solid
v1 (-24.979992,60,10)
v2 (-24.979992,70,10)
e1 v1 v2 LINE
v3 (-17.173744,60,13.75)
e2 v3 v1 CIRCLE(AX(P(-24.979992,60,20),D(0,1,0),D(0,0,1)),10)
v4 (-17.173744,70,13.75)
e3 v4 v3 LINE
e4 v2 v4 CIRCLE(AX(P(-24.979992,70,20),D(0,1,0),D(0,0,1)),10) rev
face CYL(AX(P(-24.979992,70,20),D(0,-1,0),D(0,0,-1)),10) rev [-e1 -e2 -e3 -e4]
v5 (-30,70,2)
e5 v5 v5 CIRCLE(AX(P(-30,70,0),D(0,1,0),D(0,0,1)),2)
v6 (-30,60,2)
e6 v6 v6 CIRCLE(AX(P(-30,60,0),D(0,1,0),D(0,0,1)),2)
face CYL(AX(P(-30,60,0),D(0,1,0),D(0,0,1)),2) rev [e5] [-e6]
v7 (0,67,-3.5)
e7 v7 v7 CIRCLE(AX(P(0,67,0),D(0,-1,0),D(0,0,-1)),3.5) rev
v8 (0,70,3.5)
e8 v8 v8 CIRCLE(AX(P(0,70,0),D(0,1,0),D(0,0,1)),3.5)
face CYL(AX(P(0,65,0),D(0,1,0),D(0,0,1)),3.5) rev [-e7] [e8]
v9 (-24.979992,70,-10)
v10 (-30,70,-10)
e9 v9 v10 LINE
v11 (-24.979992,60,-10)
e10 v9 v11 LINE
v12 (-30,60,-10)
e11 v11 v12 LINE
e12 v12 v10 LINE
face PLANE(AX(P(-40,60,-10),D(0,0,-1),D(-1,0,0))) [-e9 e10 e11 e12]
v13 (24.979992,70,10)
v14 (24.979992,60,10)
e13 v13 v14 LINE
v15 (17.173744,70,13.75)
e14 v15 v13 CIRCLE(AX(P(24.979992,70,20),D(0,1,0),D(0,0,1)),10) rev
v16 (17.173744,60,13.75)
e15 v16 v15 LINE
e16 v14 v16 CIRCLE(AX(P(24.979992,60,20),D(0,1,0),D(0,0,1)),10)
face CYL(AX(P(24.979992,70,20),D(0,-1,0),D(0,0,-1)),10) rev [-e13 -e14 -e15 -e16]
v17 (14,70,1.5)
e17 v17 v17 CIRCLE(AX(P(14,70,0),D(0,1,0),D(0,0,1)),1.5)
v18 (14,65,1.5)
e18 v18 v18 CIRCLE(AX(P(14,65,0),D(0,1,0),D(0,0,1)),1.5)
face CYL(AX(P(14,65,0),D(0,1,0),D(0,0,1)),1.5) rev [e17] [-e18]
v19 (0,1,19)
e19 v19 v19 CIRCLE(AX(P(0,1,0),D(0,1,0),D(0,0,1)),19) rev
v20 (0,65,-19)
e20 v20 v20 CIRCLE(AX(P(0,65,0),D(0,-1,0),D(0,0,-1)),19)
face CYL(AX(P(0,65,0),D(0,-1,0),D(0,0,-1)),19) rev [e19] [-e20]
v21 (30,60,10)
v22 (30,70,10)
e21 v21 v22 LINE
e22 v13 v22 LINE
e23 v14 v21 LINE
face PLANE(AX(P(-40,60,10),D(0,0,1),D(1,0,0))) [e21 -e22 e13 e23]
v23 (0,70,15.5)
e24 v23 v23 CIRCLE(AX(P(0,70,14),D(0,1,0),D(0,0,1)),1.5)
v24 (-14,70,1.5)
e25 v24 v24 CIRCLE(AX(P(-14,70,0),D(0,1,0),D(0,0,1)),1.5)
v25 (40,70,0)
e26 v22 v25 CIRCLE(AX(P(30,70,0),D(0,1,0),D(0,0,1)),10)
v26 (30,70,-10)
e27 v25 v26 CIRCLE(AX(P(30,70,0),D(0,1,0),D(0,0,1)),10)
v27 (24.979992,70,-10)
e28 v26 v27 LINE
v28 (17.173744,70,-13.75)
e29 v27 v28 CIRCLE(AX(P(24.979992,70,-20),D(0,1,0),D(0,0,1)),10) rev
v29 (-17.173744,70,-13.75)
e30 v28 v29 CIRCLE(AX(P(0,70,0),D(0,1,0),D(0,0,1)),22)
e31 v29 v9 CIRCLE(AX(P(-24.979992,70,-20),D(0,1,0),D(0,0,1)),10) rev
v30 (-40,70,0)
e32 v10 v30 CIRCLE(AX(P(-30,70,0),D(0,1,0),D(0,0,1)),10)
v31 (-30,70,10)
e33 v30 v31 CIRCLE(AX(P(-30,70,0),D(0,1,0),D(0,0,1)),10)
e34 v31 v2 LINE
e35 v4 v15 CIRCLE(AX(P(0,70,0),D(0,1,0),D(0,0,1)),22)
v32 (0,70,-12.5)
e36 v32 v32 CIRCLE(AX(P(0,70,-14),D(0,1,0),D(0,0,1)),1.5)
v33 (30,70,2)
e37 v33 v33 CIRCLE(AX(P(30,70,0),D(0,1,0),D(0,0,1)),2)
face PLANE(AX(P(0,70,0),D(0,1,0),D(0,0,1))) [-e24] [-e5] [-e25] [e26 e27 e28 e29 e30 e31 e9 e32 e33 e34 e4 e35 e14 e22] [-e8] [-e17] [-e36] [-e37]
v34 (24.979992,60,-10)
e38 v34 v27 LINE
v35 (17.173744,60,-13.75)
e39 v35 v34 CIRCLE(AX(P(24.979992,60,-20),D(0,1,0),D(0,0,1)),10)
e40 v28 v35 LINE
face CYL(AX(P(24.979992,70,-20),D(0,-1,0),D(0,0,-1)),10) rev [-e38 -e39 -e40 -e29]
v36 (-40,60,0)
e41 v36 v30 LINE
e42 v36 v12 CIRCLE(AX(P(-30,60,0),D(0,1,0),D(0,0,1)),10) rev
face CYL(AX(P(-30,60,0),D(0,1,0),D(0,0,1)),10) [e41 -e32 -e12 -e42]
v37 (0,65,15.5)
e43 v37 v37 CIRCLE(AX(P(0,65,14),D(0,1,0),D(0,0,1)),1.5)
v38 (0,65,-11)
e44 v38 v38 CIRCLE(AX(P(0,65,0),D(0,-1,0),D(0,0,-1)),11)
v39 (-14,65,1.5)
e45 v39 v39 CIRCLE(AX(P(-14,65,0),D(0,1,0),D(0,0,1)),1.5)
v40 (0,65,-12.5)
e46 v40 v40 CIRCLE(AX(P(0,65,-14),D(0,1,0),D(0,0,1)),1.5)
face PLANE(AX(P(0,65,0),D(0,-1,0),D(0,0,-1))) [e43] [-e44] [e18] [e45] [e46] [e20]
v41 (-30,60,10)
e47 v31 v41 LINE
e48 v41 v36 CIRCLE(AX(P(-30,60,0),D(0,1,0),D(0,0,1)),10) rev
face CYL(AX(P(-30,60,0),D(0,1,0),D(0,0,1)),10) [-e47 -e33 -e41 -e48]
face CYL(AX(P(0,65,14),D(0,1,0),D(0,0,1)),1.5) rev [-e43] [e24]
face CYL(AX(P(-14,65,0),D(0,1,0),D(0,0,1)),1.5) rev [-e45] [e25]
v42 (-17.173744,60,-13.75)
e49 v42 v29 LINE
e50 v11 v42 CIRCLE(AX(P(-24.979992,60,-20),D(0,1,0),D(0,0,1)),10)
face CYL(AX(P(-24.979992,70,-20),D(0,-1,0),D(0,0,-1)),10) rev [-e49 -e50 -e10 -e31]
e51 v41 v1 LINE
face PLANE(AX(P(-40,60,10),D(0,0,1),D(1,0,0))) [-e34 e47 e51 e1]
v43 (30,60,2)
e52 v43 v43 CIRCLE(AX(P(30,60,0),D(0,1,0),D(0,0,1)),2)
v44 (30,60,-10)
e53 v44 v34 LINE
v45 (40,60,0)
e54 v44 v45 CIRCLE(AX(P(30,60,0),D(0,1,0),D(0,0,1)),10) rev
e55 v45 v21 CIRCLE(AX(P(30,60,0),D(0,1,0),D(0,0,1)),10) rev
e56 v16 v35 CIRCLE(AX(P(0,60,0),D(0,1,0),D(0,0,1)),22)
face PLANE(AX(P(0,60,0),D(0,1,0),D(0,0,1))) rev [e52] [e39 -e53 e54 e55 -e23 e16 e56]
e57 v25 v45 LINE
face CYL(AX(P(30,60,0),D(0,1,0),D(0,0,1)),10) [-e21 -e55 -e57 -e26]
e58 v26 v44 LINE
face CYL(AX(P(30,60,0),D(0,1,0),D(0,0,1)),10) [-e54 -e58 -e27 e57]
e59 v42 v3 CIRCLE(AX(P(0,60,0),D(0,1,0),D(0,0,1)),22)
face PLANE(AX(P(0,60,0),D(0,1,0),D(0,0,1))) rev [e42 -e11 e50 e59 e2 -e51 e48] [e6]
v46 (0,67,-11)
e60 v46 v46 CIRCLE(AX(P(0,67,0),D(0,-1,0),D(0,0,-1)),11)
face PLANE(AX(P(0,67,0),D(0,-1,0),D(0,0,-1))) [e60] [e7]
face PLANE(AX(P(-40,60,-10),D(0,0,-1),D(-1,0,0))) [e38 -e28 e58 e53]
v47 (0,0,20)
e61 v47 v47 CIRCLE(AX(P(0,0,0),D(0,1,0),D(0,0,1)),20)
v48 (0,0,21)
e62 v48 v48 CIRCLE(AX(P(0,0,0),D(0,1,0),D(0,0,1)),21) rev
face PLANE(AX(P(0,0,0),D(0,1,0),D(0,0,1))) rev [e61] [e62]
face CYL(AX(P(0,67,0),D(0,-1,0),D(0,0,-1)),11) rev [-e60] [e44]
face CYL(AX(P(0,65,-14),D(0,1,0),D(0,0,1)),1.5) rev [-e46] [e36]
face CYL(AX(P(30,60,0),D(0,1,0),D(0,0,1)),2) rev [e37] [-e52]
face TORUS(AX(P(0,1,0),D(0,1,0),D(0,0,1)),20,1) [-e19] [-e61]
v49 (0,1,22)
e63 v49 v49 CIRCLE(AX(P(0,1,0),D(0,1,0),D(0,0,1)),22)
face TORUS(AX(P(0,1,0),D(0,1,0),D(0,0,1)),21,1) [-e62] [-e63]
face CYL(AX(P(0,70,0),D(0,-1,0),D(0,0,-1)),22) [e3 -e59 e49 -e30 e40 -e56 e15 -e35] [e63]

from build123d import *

# Parameters (mm, degrees)
SKETCH3_R           = 22
BOSS_EXTRUDE1_DEPTH = 70
SKETCH14_W          = 80
SKETCH14_H          = 20
BOSS_EXTRUDE3_DEPTH = 10
SKETCH4_R           = 19
CUT_EXTRUDE1_DEPTH  = 65
SKETCH5_R           = 3.5
CUT_EXTRUDE2_DEPTH  = 5
SKETCH7_R           = 1.5
CUT_EXTRUDE3_DEPTH  = 5
SKETCH15_R          = 2
CUT_EXTRUDE6_DEPTH  = 10
FILLET1_R           = 10
FILLET2_R           = 10
FILLET3_R           = 10
FILLET4_R           = 1
SKETCH16_R          = 11
CUT_EXTRUDE7_DEPTH  = 2


with BuildPart() as part:
    # Sketch3 → Boss-Extrude1 (new body)
    with BuildSketch(Plane(origin=(0, 0, 0), x_dir=(1, 0, 0), z_dir=(0, 1, 0))):
        with Locations(Location((0, 0, 0), (0, 0, 270))):
            Circle(SKETCH3_R)
    extrude(amount=BOSS_EXTRUDE1_DEPTH)

    # Sketch14 → Boss-Extrude3 (add)
    with BuildSketch(Plane(origin=(0, 70, 0), x_dir=(1, 0, 0), z_dir=(0, 1, 0))):
        Rectangle(SKETCH14_W, SKETCH14_H)
    extrude(amount=-BOSS_EXTRUDE3_DEPTH)

    # Sketch4 → Cut-Extrude1 (cut)
    with BuildSketch(Plane(origin=(0, 0, 0), x_dir=(-1, 0, 0), z_dir=(0, -1, 0))):
        with Locations(Location((0, 0, 0), (0, 0, 90))):
            Circle(SKETCH4_R)
    extrude(amount=-CUT_EXTRUDE1_DEPTH, mode=Mode.SUBTRACT)

    # Sketch5 → Cut-Extrude2 (cut)
    with BuildSketch(Plane(origin=(0, 70, 0), x_dir=(1, 0, 0), z_dir=(0, 1, 0))):
        with Locations(Location((0, 0, 0), (0, 0, 270))):
            Circle(SKETCH5_R)
    extrude(amount=-CUT_EXTRUDE2_DEPTH, mode=Mode.SUBTRACT)

    # Sketch7 → Cut-Extrude3 (cut)
    with BuildSketch(Plane(origin=(0, 70, 0), x_dir=(1, 0, 0), z_dir=(0, 1, 0))):
        with Locations(Location((0, -14, 0), (0, 0, 270))):
            Circle(SKETCH7_R)
        with Locations(Location((0, 14, 0), (0, 0, 270))):
            Circle(SKETCH7_R)
        with Locations(Location((14, 0, 0), (0, 0, 270))):
            Circle(SKETCH7_R)
        with Locations(Location((-14, 0, 0), (0, 0, 270))):
            Circle(SKETCH7_R)
    extrude(amount=-CUT_EXTRUDE3_DEPTH, mode=Mode.SUBTRACT)

    # Sketch15 → Cut-Extrude6 (cut)
    with BuildSketch(Plane(origin=(0, 70, 0), x_dir=(1, 0, 0), z_dir=(0, 1, 0))):
        with Locations(Location((30, 0, 0), (0, 0, 270))):
            Circle(SKETCH15_R)
        with Locations(Location((-30, 0, 0), (0, 0, 270))):
            Circle(SKETCH15_R)
    extrude(amount=-CUT_EXTRUDE6_DEPTH, mode=Mode.SUBTRACT)

    # Fillet1
    fillet1_edges = [part.edges().sort_by_distance(p)[0] for p in [
        (40, 65, -10),
        (40, 65, 10),
    ]]
    fillet(fillet1_edges, radius=FILLET1_R - 0.0001)  # a hair under: the kernel refuses the full size

    # Fillet2
    fillet2_edges = [part.edges().sort_by_distance(p)[0] for p in [
        (-40, 65, -10),
        (-40, 65, 10),
    ]]
    fillet(fillet2_edges, radius=FILLET2_R - 0.0001)  # a hair under: the kernel refuses the full size

    # Fillet3
    fillet3_edges = [part.edges().sort_by_distance(p)[0] for p in [
        (-19.595917942, 65, 10),
        (19.595917942, 65, 10),
        (19.595917942, 65, -10),
        (-19.595917942, 65, -10),
    ]]
    fillet(fillet3_edges, radius=FILLET3_R)

    # Fillet4
    fillet4_edges = [part.edges().sort_by_distance(p)[0] for p in [
        (0, 0, -22),
        (0, 0, 19),
    ]]
    fillet(fillet4_edges, radius=FILLET4_R)

    # Sketch16 → Cut-Extrude7 (cut)
    with BuildSketch(Plane.XZ.offset(-65)):
        with Locations(Location((0, 0, 0), (0, 0, 270))):
            Circle(SKETCH16_R)
    extrude(amount=-CUT_EXTRUDE7_DEPTH, mode=Mode.SUBTRACT)


solid = part.part
